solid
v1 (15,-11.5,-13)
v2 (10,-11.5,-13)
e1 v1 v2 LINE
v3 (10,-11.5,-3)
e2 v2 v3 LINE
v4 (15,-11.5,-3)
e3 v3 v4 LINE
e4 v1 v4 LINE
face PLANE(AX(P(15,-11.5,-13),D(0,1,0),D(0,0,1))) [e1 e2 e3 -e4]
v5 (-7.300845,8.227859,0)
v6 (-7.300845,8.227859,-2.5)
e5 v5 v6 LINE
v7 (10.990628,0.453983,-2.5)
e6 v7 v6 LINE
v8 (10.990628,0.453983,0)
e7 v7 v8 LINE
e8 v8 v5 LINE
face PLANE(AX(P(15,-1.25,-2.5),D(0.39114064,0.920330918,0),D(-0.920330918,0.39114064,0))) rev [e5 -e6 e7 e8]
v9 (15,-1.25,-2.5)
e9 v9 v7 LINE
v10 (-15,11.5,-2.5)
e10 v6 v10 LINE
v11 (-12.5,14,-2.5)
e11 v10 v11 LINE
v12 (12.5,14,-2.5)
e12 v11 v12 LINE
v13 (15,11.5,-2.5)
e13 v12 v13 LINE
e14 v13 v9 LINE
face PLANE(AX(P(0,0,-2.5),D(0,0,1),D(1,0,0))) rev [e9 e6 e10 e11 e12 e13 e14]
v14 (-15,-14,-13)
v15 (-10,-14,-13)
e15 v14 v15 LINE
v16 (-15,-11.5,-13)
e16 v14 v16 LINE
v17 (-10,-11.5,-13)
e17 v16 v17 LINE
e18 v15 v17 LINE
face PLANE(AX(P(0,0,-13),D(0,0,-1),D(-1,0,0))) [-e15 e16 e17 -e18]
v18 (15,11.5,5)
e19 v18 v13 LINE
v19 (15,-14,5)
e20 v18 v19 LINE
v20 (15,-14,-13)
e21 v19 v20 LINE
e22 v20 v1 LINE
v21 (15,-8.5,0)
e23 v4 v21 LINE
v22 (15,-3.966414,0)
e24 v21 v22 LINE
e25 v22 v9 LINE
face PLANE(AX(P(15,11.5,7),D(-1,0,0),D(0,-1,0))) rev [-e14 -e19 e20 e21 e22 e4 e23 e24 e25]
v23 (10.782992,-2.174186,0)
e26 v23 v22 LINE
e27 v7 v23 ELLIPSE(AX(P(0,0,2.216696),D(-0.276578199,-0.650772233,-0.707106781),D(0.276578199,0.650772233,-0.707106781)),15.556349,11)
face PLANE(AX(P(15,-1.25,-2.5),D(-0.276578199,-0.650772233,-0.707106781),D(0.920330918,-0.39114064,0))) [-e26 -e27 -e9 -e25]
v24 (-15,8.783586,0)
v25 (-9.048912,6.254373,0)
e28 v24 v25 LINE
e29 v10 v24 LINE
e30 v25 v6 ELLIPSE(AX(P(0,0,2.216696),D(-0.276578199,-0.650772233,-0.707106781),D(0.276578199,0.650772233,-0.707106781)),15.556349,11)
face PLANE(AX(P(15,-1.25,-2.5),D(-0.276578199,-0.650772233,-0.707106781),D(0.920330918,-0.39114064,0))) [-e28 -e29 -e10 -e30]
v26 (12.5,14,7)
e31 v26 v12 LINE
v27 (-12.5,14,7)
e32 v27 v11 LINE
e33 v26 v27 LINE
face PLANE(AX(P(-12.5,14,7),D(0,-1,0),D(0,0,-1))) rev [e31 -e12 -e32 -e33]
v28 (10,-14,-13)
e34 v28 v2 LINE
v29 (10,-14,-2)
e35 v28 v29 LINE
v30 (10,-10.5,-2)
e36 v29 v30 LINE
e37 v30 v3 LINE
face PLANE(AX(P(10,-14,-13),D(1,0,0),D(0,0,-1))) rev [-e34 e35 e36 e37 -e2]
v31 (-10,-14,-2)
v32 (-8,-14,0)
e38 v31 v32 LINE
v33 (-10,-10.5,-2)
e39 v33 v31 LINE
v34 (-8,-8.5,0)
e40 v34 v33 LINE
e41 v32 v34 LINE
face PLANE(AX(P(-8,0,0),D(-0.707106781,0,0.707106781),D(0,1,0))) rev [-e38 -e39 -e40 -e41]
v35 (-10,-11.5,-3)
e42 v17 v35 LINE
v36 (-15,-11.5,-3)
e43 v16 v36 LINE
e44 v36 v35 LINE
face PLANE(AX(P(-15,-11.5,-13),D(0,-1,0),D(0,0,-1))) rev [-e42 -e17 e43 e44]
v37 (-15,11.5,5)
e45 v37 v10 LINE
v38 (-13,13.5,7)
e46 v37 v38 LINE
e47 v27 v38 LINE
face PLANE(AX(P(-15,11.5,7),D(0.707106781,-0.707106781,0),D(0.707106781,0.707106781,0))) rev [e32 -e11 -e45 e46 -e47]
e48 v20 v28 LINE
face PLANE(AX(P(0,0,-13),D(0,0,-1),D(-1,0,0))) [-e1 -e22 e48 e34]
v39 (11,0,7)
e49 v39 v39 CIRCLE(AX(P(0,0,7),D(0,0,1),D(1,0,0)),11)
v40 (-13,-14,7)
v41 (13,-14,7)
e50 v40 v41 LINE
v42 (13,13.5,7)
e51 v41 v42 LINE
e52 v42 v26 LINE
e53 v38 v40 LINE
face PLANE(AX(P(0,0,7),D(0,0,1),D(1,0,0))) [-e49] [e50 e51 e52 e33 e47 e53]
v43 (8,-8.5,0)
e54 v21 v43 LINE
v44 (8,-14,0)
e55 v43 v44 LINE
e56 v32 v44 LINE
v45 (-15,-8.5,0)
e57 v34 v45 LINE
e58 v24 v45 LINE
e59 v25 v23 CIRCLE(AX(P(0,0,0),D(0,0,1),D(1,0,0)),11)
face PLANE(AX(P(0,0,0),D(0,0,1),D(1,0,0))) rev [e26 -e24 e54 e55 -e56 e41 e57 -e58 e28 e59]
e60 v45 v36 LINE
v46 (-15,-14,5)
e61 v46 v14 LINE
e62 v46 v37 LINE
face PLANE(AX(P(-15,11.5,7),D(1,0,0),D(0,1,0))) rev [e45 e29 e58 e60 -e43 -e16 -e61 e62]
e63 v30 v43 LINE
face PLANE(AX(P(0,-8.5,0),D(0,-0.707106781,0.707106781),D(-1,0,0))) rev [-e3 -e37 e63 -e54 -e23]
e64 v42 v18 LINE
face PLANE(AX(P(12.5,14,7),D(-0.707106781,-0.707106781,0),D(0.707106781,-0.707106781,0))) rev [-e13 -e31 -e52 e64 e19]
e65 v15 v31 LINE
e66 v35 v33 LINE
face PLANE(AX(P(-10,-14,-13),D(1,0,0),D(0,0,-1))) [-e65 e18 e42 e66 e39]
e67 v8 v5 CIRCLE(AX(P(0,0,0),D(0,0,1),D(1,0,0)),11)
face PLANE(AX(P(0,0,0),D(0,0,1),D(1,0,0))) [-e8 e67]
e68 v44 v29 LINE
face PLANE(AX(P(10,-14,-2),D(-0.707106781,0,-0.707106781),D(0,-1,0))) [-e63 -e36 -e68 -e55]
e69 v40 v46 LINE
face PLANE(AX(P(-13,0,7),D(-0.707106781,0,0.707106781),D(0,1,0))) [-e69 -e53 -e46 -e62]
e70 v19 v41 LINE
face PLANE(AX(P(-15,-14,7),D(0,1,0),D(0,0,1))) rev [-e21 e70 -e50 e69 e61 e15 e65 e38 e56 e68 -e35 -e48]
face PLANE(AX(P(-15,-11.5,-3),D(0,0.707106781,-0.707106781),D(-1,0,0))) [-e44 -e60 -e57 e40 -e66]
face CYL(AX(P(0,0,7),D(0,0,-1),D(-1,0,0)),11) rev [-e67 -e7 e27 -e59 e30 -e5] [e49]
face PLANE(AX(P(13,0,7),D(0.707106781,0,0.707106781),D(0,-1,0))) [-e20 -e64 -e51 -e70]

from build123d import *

# Parameters (mm, degrees)
SKETCH1_R           = 11
BOSS_EXTRUDE1_DEPTH = 7
SKETCH2_W           = 5
SKETCH2_H           = 2.5
BOSS_EXTRUDE2_DEPTH = 13
CHAMFER1_SIZE       = 3
CHAMFER2_SIZE       = 2
CHAMFER3_SIZE       = 2
CHAMFER4_SIZE       = 2
BOSS_EXTRUDE4_DEPTH = 2.5
CHAMFER6_SIZE       = 2.5


with BuildPart() as part:
    # Sketch1 → Boss-Extrude1 (new body)
    with BuildSketch(Plane.XY):
        Polygon((-15, 11.5), (-12.5, 14), (12.5, 14), (15, 11.5), (15, -14), (-15, -14), align=None)
        Circle(SKETCH1_R, mode=Mode.SUBTRACT)
    extrude(amount=BOSS_EXTRUDE1_DEPTH)

    # Sketch2 → Boss-Extrude2 (add)
    with BuildSketch(Plane(origin=(0, 0, 0), x_dir=(-1, 0, 0), z_dir=(0, 0, -1))):
        with Locations((-12.5, -12.75)):
            Rectangle(SKETCH2_W, SKETCH2_H)
        with Locations((12.5, -12.75)):
            Rectangle(SKETCH2_W, SKETCH2_H)
    extrude(amount=BOSS_EXTRUDE2_DEPTH)

    # Chamfer1
    chamfer1_edges = [part.edges().sort_by_distance(p)[0] for p in [
        (-12.5, -11.5, 0),
        (12.5, -11.5, 0),
    ]]
    chamfer(chamfer1_edges, length=CHAMFER1_SIZE)

    # Chamfer2
    chamfer2_edges = [part.edges().sort_by_distance(p)[0] for p in [
        (-10, -11.25, 0),
        (10, -11.25, 0),
    ]]
    chamfer(chamfer2_edges, length=CHAMFER2_SIZE)

    # Chamfer3
    chamfer3_edges = [part.edges().sort_by_distance(p)[0] for p in [
        (15, -1.25, 7),
    ]]
    chamfer(chamfer3_edges, length=CHAMFER3_SIZE)

    # Chamfer4
    chamfer4_edges = [part.edges().sort_by_distance(p)[0] for p in [
        (-15, -1.25, 7),
    ]]
    chamfer(chamfer4_edges, length=CHAMFER4_SIZE)

    # Sketch4 → Boss-Extrude4 (add)
    with BuildSketch(Plane(origin=(0, 0, 0), x_dir=(-1, 0, 0), z_dir=(0, 0, -1))):
        Polygon((-15, -1.25), (15, 11.5), (12.5, 14), (-12.5, 14), (-15, 11.5), align=None)
    extrude(amount=BOSS_EXTRUDE4_DEPTH)

    # Chamfer6
    # the kernel refuses this chamfer: 2.5 mm, written as the material it adds along each edge
    with BuildSketch(Plane(origin=(20.916998416, -3.764724327, 0), x_dir=(0.01075475478430782, 0.02530530537484193, -0.9996219169112968), z_dir=(-0.9203309184584746, 0.39114064034485174, 0))) as chamfer6_piece_1_section:
        Polygon((CHAMFER6_SIZE * 0.999621916911, CHAMFER6_SIZE * 0.0274958766106), (-CHAMFER6_SIZE * 0.0274958766106, CHAMFER6_SIZE * 0.999621916911), (0, 0), align=None)
    chamfer6_piece_1 = extrude(amount=17.214861222, mode=Mode.PRIVATE)
    chamfer6_piece_1 = chamfer6_piece_1 - Plane(origin=(0, 0, -0.830769879), x_dir=(1, 0, 0), z_dir=(0, 0, -1)) * Cylinder(11, 45, mode=Mode.PRIVATE)
    chamfer6_piece_1 = split(chamfer6_piece_1, bisect_by=Plane(origin=(15, -1.305255327, -0.830769879), z_dir=(-1, 0, 0)), keep=Keep.TOP, mode=Mode.PRIVATE)
    add(chamfer6_piece_1)
    with BuildSketch(Plane(origin=(-1.383846422, 5.71313473, 0), x_dir=(0.010754754784307773, 0.025305305374841817, -0.9996219169112968), z_dir=(-0.9203309184584746, 0.39114064034485174, 0))) as chamfer6_piece_2_section:
        Polygon((CHAMFER6_SIZE * 0.999621916911, CHAMFER6_SIZE * 0.0274958766106), (-CHAMFER6_SIZE * 0.0274958766106, CHAMFER6_SIZE * 0.999621916911), (0, 0), align=None)
    chamfer6_piece_2 = extrude(amount=21.224052785, mode=Mode.PRIVATE)
    chamfer6_piece_2 = chamfer6_piece_2 - Plane(origin=(0, 0, -0.851096237), x_dir=(1, 0, 0), z_dir=(0, 0, -1)) * Cylinder(11, 53, mode=Mode.PRIVATE)
    chamfer6_piece_2 = split(chamfer6_piece_2, bisect_by=Plane(origin=(-15, 9.126408424, -0.851096237), z_dir=(1, 0, 0)), keep=Keep.TOP, mode=Mode.PRIVATE)
    add(chamfer6_piece_2)


solid = part.part
